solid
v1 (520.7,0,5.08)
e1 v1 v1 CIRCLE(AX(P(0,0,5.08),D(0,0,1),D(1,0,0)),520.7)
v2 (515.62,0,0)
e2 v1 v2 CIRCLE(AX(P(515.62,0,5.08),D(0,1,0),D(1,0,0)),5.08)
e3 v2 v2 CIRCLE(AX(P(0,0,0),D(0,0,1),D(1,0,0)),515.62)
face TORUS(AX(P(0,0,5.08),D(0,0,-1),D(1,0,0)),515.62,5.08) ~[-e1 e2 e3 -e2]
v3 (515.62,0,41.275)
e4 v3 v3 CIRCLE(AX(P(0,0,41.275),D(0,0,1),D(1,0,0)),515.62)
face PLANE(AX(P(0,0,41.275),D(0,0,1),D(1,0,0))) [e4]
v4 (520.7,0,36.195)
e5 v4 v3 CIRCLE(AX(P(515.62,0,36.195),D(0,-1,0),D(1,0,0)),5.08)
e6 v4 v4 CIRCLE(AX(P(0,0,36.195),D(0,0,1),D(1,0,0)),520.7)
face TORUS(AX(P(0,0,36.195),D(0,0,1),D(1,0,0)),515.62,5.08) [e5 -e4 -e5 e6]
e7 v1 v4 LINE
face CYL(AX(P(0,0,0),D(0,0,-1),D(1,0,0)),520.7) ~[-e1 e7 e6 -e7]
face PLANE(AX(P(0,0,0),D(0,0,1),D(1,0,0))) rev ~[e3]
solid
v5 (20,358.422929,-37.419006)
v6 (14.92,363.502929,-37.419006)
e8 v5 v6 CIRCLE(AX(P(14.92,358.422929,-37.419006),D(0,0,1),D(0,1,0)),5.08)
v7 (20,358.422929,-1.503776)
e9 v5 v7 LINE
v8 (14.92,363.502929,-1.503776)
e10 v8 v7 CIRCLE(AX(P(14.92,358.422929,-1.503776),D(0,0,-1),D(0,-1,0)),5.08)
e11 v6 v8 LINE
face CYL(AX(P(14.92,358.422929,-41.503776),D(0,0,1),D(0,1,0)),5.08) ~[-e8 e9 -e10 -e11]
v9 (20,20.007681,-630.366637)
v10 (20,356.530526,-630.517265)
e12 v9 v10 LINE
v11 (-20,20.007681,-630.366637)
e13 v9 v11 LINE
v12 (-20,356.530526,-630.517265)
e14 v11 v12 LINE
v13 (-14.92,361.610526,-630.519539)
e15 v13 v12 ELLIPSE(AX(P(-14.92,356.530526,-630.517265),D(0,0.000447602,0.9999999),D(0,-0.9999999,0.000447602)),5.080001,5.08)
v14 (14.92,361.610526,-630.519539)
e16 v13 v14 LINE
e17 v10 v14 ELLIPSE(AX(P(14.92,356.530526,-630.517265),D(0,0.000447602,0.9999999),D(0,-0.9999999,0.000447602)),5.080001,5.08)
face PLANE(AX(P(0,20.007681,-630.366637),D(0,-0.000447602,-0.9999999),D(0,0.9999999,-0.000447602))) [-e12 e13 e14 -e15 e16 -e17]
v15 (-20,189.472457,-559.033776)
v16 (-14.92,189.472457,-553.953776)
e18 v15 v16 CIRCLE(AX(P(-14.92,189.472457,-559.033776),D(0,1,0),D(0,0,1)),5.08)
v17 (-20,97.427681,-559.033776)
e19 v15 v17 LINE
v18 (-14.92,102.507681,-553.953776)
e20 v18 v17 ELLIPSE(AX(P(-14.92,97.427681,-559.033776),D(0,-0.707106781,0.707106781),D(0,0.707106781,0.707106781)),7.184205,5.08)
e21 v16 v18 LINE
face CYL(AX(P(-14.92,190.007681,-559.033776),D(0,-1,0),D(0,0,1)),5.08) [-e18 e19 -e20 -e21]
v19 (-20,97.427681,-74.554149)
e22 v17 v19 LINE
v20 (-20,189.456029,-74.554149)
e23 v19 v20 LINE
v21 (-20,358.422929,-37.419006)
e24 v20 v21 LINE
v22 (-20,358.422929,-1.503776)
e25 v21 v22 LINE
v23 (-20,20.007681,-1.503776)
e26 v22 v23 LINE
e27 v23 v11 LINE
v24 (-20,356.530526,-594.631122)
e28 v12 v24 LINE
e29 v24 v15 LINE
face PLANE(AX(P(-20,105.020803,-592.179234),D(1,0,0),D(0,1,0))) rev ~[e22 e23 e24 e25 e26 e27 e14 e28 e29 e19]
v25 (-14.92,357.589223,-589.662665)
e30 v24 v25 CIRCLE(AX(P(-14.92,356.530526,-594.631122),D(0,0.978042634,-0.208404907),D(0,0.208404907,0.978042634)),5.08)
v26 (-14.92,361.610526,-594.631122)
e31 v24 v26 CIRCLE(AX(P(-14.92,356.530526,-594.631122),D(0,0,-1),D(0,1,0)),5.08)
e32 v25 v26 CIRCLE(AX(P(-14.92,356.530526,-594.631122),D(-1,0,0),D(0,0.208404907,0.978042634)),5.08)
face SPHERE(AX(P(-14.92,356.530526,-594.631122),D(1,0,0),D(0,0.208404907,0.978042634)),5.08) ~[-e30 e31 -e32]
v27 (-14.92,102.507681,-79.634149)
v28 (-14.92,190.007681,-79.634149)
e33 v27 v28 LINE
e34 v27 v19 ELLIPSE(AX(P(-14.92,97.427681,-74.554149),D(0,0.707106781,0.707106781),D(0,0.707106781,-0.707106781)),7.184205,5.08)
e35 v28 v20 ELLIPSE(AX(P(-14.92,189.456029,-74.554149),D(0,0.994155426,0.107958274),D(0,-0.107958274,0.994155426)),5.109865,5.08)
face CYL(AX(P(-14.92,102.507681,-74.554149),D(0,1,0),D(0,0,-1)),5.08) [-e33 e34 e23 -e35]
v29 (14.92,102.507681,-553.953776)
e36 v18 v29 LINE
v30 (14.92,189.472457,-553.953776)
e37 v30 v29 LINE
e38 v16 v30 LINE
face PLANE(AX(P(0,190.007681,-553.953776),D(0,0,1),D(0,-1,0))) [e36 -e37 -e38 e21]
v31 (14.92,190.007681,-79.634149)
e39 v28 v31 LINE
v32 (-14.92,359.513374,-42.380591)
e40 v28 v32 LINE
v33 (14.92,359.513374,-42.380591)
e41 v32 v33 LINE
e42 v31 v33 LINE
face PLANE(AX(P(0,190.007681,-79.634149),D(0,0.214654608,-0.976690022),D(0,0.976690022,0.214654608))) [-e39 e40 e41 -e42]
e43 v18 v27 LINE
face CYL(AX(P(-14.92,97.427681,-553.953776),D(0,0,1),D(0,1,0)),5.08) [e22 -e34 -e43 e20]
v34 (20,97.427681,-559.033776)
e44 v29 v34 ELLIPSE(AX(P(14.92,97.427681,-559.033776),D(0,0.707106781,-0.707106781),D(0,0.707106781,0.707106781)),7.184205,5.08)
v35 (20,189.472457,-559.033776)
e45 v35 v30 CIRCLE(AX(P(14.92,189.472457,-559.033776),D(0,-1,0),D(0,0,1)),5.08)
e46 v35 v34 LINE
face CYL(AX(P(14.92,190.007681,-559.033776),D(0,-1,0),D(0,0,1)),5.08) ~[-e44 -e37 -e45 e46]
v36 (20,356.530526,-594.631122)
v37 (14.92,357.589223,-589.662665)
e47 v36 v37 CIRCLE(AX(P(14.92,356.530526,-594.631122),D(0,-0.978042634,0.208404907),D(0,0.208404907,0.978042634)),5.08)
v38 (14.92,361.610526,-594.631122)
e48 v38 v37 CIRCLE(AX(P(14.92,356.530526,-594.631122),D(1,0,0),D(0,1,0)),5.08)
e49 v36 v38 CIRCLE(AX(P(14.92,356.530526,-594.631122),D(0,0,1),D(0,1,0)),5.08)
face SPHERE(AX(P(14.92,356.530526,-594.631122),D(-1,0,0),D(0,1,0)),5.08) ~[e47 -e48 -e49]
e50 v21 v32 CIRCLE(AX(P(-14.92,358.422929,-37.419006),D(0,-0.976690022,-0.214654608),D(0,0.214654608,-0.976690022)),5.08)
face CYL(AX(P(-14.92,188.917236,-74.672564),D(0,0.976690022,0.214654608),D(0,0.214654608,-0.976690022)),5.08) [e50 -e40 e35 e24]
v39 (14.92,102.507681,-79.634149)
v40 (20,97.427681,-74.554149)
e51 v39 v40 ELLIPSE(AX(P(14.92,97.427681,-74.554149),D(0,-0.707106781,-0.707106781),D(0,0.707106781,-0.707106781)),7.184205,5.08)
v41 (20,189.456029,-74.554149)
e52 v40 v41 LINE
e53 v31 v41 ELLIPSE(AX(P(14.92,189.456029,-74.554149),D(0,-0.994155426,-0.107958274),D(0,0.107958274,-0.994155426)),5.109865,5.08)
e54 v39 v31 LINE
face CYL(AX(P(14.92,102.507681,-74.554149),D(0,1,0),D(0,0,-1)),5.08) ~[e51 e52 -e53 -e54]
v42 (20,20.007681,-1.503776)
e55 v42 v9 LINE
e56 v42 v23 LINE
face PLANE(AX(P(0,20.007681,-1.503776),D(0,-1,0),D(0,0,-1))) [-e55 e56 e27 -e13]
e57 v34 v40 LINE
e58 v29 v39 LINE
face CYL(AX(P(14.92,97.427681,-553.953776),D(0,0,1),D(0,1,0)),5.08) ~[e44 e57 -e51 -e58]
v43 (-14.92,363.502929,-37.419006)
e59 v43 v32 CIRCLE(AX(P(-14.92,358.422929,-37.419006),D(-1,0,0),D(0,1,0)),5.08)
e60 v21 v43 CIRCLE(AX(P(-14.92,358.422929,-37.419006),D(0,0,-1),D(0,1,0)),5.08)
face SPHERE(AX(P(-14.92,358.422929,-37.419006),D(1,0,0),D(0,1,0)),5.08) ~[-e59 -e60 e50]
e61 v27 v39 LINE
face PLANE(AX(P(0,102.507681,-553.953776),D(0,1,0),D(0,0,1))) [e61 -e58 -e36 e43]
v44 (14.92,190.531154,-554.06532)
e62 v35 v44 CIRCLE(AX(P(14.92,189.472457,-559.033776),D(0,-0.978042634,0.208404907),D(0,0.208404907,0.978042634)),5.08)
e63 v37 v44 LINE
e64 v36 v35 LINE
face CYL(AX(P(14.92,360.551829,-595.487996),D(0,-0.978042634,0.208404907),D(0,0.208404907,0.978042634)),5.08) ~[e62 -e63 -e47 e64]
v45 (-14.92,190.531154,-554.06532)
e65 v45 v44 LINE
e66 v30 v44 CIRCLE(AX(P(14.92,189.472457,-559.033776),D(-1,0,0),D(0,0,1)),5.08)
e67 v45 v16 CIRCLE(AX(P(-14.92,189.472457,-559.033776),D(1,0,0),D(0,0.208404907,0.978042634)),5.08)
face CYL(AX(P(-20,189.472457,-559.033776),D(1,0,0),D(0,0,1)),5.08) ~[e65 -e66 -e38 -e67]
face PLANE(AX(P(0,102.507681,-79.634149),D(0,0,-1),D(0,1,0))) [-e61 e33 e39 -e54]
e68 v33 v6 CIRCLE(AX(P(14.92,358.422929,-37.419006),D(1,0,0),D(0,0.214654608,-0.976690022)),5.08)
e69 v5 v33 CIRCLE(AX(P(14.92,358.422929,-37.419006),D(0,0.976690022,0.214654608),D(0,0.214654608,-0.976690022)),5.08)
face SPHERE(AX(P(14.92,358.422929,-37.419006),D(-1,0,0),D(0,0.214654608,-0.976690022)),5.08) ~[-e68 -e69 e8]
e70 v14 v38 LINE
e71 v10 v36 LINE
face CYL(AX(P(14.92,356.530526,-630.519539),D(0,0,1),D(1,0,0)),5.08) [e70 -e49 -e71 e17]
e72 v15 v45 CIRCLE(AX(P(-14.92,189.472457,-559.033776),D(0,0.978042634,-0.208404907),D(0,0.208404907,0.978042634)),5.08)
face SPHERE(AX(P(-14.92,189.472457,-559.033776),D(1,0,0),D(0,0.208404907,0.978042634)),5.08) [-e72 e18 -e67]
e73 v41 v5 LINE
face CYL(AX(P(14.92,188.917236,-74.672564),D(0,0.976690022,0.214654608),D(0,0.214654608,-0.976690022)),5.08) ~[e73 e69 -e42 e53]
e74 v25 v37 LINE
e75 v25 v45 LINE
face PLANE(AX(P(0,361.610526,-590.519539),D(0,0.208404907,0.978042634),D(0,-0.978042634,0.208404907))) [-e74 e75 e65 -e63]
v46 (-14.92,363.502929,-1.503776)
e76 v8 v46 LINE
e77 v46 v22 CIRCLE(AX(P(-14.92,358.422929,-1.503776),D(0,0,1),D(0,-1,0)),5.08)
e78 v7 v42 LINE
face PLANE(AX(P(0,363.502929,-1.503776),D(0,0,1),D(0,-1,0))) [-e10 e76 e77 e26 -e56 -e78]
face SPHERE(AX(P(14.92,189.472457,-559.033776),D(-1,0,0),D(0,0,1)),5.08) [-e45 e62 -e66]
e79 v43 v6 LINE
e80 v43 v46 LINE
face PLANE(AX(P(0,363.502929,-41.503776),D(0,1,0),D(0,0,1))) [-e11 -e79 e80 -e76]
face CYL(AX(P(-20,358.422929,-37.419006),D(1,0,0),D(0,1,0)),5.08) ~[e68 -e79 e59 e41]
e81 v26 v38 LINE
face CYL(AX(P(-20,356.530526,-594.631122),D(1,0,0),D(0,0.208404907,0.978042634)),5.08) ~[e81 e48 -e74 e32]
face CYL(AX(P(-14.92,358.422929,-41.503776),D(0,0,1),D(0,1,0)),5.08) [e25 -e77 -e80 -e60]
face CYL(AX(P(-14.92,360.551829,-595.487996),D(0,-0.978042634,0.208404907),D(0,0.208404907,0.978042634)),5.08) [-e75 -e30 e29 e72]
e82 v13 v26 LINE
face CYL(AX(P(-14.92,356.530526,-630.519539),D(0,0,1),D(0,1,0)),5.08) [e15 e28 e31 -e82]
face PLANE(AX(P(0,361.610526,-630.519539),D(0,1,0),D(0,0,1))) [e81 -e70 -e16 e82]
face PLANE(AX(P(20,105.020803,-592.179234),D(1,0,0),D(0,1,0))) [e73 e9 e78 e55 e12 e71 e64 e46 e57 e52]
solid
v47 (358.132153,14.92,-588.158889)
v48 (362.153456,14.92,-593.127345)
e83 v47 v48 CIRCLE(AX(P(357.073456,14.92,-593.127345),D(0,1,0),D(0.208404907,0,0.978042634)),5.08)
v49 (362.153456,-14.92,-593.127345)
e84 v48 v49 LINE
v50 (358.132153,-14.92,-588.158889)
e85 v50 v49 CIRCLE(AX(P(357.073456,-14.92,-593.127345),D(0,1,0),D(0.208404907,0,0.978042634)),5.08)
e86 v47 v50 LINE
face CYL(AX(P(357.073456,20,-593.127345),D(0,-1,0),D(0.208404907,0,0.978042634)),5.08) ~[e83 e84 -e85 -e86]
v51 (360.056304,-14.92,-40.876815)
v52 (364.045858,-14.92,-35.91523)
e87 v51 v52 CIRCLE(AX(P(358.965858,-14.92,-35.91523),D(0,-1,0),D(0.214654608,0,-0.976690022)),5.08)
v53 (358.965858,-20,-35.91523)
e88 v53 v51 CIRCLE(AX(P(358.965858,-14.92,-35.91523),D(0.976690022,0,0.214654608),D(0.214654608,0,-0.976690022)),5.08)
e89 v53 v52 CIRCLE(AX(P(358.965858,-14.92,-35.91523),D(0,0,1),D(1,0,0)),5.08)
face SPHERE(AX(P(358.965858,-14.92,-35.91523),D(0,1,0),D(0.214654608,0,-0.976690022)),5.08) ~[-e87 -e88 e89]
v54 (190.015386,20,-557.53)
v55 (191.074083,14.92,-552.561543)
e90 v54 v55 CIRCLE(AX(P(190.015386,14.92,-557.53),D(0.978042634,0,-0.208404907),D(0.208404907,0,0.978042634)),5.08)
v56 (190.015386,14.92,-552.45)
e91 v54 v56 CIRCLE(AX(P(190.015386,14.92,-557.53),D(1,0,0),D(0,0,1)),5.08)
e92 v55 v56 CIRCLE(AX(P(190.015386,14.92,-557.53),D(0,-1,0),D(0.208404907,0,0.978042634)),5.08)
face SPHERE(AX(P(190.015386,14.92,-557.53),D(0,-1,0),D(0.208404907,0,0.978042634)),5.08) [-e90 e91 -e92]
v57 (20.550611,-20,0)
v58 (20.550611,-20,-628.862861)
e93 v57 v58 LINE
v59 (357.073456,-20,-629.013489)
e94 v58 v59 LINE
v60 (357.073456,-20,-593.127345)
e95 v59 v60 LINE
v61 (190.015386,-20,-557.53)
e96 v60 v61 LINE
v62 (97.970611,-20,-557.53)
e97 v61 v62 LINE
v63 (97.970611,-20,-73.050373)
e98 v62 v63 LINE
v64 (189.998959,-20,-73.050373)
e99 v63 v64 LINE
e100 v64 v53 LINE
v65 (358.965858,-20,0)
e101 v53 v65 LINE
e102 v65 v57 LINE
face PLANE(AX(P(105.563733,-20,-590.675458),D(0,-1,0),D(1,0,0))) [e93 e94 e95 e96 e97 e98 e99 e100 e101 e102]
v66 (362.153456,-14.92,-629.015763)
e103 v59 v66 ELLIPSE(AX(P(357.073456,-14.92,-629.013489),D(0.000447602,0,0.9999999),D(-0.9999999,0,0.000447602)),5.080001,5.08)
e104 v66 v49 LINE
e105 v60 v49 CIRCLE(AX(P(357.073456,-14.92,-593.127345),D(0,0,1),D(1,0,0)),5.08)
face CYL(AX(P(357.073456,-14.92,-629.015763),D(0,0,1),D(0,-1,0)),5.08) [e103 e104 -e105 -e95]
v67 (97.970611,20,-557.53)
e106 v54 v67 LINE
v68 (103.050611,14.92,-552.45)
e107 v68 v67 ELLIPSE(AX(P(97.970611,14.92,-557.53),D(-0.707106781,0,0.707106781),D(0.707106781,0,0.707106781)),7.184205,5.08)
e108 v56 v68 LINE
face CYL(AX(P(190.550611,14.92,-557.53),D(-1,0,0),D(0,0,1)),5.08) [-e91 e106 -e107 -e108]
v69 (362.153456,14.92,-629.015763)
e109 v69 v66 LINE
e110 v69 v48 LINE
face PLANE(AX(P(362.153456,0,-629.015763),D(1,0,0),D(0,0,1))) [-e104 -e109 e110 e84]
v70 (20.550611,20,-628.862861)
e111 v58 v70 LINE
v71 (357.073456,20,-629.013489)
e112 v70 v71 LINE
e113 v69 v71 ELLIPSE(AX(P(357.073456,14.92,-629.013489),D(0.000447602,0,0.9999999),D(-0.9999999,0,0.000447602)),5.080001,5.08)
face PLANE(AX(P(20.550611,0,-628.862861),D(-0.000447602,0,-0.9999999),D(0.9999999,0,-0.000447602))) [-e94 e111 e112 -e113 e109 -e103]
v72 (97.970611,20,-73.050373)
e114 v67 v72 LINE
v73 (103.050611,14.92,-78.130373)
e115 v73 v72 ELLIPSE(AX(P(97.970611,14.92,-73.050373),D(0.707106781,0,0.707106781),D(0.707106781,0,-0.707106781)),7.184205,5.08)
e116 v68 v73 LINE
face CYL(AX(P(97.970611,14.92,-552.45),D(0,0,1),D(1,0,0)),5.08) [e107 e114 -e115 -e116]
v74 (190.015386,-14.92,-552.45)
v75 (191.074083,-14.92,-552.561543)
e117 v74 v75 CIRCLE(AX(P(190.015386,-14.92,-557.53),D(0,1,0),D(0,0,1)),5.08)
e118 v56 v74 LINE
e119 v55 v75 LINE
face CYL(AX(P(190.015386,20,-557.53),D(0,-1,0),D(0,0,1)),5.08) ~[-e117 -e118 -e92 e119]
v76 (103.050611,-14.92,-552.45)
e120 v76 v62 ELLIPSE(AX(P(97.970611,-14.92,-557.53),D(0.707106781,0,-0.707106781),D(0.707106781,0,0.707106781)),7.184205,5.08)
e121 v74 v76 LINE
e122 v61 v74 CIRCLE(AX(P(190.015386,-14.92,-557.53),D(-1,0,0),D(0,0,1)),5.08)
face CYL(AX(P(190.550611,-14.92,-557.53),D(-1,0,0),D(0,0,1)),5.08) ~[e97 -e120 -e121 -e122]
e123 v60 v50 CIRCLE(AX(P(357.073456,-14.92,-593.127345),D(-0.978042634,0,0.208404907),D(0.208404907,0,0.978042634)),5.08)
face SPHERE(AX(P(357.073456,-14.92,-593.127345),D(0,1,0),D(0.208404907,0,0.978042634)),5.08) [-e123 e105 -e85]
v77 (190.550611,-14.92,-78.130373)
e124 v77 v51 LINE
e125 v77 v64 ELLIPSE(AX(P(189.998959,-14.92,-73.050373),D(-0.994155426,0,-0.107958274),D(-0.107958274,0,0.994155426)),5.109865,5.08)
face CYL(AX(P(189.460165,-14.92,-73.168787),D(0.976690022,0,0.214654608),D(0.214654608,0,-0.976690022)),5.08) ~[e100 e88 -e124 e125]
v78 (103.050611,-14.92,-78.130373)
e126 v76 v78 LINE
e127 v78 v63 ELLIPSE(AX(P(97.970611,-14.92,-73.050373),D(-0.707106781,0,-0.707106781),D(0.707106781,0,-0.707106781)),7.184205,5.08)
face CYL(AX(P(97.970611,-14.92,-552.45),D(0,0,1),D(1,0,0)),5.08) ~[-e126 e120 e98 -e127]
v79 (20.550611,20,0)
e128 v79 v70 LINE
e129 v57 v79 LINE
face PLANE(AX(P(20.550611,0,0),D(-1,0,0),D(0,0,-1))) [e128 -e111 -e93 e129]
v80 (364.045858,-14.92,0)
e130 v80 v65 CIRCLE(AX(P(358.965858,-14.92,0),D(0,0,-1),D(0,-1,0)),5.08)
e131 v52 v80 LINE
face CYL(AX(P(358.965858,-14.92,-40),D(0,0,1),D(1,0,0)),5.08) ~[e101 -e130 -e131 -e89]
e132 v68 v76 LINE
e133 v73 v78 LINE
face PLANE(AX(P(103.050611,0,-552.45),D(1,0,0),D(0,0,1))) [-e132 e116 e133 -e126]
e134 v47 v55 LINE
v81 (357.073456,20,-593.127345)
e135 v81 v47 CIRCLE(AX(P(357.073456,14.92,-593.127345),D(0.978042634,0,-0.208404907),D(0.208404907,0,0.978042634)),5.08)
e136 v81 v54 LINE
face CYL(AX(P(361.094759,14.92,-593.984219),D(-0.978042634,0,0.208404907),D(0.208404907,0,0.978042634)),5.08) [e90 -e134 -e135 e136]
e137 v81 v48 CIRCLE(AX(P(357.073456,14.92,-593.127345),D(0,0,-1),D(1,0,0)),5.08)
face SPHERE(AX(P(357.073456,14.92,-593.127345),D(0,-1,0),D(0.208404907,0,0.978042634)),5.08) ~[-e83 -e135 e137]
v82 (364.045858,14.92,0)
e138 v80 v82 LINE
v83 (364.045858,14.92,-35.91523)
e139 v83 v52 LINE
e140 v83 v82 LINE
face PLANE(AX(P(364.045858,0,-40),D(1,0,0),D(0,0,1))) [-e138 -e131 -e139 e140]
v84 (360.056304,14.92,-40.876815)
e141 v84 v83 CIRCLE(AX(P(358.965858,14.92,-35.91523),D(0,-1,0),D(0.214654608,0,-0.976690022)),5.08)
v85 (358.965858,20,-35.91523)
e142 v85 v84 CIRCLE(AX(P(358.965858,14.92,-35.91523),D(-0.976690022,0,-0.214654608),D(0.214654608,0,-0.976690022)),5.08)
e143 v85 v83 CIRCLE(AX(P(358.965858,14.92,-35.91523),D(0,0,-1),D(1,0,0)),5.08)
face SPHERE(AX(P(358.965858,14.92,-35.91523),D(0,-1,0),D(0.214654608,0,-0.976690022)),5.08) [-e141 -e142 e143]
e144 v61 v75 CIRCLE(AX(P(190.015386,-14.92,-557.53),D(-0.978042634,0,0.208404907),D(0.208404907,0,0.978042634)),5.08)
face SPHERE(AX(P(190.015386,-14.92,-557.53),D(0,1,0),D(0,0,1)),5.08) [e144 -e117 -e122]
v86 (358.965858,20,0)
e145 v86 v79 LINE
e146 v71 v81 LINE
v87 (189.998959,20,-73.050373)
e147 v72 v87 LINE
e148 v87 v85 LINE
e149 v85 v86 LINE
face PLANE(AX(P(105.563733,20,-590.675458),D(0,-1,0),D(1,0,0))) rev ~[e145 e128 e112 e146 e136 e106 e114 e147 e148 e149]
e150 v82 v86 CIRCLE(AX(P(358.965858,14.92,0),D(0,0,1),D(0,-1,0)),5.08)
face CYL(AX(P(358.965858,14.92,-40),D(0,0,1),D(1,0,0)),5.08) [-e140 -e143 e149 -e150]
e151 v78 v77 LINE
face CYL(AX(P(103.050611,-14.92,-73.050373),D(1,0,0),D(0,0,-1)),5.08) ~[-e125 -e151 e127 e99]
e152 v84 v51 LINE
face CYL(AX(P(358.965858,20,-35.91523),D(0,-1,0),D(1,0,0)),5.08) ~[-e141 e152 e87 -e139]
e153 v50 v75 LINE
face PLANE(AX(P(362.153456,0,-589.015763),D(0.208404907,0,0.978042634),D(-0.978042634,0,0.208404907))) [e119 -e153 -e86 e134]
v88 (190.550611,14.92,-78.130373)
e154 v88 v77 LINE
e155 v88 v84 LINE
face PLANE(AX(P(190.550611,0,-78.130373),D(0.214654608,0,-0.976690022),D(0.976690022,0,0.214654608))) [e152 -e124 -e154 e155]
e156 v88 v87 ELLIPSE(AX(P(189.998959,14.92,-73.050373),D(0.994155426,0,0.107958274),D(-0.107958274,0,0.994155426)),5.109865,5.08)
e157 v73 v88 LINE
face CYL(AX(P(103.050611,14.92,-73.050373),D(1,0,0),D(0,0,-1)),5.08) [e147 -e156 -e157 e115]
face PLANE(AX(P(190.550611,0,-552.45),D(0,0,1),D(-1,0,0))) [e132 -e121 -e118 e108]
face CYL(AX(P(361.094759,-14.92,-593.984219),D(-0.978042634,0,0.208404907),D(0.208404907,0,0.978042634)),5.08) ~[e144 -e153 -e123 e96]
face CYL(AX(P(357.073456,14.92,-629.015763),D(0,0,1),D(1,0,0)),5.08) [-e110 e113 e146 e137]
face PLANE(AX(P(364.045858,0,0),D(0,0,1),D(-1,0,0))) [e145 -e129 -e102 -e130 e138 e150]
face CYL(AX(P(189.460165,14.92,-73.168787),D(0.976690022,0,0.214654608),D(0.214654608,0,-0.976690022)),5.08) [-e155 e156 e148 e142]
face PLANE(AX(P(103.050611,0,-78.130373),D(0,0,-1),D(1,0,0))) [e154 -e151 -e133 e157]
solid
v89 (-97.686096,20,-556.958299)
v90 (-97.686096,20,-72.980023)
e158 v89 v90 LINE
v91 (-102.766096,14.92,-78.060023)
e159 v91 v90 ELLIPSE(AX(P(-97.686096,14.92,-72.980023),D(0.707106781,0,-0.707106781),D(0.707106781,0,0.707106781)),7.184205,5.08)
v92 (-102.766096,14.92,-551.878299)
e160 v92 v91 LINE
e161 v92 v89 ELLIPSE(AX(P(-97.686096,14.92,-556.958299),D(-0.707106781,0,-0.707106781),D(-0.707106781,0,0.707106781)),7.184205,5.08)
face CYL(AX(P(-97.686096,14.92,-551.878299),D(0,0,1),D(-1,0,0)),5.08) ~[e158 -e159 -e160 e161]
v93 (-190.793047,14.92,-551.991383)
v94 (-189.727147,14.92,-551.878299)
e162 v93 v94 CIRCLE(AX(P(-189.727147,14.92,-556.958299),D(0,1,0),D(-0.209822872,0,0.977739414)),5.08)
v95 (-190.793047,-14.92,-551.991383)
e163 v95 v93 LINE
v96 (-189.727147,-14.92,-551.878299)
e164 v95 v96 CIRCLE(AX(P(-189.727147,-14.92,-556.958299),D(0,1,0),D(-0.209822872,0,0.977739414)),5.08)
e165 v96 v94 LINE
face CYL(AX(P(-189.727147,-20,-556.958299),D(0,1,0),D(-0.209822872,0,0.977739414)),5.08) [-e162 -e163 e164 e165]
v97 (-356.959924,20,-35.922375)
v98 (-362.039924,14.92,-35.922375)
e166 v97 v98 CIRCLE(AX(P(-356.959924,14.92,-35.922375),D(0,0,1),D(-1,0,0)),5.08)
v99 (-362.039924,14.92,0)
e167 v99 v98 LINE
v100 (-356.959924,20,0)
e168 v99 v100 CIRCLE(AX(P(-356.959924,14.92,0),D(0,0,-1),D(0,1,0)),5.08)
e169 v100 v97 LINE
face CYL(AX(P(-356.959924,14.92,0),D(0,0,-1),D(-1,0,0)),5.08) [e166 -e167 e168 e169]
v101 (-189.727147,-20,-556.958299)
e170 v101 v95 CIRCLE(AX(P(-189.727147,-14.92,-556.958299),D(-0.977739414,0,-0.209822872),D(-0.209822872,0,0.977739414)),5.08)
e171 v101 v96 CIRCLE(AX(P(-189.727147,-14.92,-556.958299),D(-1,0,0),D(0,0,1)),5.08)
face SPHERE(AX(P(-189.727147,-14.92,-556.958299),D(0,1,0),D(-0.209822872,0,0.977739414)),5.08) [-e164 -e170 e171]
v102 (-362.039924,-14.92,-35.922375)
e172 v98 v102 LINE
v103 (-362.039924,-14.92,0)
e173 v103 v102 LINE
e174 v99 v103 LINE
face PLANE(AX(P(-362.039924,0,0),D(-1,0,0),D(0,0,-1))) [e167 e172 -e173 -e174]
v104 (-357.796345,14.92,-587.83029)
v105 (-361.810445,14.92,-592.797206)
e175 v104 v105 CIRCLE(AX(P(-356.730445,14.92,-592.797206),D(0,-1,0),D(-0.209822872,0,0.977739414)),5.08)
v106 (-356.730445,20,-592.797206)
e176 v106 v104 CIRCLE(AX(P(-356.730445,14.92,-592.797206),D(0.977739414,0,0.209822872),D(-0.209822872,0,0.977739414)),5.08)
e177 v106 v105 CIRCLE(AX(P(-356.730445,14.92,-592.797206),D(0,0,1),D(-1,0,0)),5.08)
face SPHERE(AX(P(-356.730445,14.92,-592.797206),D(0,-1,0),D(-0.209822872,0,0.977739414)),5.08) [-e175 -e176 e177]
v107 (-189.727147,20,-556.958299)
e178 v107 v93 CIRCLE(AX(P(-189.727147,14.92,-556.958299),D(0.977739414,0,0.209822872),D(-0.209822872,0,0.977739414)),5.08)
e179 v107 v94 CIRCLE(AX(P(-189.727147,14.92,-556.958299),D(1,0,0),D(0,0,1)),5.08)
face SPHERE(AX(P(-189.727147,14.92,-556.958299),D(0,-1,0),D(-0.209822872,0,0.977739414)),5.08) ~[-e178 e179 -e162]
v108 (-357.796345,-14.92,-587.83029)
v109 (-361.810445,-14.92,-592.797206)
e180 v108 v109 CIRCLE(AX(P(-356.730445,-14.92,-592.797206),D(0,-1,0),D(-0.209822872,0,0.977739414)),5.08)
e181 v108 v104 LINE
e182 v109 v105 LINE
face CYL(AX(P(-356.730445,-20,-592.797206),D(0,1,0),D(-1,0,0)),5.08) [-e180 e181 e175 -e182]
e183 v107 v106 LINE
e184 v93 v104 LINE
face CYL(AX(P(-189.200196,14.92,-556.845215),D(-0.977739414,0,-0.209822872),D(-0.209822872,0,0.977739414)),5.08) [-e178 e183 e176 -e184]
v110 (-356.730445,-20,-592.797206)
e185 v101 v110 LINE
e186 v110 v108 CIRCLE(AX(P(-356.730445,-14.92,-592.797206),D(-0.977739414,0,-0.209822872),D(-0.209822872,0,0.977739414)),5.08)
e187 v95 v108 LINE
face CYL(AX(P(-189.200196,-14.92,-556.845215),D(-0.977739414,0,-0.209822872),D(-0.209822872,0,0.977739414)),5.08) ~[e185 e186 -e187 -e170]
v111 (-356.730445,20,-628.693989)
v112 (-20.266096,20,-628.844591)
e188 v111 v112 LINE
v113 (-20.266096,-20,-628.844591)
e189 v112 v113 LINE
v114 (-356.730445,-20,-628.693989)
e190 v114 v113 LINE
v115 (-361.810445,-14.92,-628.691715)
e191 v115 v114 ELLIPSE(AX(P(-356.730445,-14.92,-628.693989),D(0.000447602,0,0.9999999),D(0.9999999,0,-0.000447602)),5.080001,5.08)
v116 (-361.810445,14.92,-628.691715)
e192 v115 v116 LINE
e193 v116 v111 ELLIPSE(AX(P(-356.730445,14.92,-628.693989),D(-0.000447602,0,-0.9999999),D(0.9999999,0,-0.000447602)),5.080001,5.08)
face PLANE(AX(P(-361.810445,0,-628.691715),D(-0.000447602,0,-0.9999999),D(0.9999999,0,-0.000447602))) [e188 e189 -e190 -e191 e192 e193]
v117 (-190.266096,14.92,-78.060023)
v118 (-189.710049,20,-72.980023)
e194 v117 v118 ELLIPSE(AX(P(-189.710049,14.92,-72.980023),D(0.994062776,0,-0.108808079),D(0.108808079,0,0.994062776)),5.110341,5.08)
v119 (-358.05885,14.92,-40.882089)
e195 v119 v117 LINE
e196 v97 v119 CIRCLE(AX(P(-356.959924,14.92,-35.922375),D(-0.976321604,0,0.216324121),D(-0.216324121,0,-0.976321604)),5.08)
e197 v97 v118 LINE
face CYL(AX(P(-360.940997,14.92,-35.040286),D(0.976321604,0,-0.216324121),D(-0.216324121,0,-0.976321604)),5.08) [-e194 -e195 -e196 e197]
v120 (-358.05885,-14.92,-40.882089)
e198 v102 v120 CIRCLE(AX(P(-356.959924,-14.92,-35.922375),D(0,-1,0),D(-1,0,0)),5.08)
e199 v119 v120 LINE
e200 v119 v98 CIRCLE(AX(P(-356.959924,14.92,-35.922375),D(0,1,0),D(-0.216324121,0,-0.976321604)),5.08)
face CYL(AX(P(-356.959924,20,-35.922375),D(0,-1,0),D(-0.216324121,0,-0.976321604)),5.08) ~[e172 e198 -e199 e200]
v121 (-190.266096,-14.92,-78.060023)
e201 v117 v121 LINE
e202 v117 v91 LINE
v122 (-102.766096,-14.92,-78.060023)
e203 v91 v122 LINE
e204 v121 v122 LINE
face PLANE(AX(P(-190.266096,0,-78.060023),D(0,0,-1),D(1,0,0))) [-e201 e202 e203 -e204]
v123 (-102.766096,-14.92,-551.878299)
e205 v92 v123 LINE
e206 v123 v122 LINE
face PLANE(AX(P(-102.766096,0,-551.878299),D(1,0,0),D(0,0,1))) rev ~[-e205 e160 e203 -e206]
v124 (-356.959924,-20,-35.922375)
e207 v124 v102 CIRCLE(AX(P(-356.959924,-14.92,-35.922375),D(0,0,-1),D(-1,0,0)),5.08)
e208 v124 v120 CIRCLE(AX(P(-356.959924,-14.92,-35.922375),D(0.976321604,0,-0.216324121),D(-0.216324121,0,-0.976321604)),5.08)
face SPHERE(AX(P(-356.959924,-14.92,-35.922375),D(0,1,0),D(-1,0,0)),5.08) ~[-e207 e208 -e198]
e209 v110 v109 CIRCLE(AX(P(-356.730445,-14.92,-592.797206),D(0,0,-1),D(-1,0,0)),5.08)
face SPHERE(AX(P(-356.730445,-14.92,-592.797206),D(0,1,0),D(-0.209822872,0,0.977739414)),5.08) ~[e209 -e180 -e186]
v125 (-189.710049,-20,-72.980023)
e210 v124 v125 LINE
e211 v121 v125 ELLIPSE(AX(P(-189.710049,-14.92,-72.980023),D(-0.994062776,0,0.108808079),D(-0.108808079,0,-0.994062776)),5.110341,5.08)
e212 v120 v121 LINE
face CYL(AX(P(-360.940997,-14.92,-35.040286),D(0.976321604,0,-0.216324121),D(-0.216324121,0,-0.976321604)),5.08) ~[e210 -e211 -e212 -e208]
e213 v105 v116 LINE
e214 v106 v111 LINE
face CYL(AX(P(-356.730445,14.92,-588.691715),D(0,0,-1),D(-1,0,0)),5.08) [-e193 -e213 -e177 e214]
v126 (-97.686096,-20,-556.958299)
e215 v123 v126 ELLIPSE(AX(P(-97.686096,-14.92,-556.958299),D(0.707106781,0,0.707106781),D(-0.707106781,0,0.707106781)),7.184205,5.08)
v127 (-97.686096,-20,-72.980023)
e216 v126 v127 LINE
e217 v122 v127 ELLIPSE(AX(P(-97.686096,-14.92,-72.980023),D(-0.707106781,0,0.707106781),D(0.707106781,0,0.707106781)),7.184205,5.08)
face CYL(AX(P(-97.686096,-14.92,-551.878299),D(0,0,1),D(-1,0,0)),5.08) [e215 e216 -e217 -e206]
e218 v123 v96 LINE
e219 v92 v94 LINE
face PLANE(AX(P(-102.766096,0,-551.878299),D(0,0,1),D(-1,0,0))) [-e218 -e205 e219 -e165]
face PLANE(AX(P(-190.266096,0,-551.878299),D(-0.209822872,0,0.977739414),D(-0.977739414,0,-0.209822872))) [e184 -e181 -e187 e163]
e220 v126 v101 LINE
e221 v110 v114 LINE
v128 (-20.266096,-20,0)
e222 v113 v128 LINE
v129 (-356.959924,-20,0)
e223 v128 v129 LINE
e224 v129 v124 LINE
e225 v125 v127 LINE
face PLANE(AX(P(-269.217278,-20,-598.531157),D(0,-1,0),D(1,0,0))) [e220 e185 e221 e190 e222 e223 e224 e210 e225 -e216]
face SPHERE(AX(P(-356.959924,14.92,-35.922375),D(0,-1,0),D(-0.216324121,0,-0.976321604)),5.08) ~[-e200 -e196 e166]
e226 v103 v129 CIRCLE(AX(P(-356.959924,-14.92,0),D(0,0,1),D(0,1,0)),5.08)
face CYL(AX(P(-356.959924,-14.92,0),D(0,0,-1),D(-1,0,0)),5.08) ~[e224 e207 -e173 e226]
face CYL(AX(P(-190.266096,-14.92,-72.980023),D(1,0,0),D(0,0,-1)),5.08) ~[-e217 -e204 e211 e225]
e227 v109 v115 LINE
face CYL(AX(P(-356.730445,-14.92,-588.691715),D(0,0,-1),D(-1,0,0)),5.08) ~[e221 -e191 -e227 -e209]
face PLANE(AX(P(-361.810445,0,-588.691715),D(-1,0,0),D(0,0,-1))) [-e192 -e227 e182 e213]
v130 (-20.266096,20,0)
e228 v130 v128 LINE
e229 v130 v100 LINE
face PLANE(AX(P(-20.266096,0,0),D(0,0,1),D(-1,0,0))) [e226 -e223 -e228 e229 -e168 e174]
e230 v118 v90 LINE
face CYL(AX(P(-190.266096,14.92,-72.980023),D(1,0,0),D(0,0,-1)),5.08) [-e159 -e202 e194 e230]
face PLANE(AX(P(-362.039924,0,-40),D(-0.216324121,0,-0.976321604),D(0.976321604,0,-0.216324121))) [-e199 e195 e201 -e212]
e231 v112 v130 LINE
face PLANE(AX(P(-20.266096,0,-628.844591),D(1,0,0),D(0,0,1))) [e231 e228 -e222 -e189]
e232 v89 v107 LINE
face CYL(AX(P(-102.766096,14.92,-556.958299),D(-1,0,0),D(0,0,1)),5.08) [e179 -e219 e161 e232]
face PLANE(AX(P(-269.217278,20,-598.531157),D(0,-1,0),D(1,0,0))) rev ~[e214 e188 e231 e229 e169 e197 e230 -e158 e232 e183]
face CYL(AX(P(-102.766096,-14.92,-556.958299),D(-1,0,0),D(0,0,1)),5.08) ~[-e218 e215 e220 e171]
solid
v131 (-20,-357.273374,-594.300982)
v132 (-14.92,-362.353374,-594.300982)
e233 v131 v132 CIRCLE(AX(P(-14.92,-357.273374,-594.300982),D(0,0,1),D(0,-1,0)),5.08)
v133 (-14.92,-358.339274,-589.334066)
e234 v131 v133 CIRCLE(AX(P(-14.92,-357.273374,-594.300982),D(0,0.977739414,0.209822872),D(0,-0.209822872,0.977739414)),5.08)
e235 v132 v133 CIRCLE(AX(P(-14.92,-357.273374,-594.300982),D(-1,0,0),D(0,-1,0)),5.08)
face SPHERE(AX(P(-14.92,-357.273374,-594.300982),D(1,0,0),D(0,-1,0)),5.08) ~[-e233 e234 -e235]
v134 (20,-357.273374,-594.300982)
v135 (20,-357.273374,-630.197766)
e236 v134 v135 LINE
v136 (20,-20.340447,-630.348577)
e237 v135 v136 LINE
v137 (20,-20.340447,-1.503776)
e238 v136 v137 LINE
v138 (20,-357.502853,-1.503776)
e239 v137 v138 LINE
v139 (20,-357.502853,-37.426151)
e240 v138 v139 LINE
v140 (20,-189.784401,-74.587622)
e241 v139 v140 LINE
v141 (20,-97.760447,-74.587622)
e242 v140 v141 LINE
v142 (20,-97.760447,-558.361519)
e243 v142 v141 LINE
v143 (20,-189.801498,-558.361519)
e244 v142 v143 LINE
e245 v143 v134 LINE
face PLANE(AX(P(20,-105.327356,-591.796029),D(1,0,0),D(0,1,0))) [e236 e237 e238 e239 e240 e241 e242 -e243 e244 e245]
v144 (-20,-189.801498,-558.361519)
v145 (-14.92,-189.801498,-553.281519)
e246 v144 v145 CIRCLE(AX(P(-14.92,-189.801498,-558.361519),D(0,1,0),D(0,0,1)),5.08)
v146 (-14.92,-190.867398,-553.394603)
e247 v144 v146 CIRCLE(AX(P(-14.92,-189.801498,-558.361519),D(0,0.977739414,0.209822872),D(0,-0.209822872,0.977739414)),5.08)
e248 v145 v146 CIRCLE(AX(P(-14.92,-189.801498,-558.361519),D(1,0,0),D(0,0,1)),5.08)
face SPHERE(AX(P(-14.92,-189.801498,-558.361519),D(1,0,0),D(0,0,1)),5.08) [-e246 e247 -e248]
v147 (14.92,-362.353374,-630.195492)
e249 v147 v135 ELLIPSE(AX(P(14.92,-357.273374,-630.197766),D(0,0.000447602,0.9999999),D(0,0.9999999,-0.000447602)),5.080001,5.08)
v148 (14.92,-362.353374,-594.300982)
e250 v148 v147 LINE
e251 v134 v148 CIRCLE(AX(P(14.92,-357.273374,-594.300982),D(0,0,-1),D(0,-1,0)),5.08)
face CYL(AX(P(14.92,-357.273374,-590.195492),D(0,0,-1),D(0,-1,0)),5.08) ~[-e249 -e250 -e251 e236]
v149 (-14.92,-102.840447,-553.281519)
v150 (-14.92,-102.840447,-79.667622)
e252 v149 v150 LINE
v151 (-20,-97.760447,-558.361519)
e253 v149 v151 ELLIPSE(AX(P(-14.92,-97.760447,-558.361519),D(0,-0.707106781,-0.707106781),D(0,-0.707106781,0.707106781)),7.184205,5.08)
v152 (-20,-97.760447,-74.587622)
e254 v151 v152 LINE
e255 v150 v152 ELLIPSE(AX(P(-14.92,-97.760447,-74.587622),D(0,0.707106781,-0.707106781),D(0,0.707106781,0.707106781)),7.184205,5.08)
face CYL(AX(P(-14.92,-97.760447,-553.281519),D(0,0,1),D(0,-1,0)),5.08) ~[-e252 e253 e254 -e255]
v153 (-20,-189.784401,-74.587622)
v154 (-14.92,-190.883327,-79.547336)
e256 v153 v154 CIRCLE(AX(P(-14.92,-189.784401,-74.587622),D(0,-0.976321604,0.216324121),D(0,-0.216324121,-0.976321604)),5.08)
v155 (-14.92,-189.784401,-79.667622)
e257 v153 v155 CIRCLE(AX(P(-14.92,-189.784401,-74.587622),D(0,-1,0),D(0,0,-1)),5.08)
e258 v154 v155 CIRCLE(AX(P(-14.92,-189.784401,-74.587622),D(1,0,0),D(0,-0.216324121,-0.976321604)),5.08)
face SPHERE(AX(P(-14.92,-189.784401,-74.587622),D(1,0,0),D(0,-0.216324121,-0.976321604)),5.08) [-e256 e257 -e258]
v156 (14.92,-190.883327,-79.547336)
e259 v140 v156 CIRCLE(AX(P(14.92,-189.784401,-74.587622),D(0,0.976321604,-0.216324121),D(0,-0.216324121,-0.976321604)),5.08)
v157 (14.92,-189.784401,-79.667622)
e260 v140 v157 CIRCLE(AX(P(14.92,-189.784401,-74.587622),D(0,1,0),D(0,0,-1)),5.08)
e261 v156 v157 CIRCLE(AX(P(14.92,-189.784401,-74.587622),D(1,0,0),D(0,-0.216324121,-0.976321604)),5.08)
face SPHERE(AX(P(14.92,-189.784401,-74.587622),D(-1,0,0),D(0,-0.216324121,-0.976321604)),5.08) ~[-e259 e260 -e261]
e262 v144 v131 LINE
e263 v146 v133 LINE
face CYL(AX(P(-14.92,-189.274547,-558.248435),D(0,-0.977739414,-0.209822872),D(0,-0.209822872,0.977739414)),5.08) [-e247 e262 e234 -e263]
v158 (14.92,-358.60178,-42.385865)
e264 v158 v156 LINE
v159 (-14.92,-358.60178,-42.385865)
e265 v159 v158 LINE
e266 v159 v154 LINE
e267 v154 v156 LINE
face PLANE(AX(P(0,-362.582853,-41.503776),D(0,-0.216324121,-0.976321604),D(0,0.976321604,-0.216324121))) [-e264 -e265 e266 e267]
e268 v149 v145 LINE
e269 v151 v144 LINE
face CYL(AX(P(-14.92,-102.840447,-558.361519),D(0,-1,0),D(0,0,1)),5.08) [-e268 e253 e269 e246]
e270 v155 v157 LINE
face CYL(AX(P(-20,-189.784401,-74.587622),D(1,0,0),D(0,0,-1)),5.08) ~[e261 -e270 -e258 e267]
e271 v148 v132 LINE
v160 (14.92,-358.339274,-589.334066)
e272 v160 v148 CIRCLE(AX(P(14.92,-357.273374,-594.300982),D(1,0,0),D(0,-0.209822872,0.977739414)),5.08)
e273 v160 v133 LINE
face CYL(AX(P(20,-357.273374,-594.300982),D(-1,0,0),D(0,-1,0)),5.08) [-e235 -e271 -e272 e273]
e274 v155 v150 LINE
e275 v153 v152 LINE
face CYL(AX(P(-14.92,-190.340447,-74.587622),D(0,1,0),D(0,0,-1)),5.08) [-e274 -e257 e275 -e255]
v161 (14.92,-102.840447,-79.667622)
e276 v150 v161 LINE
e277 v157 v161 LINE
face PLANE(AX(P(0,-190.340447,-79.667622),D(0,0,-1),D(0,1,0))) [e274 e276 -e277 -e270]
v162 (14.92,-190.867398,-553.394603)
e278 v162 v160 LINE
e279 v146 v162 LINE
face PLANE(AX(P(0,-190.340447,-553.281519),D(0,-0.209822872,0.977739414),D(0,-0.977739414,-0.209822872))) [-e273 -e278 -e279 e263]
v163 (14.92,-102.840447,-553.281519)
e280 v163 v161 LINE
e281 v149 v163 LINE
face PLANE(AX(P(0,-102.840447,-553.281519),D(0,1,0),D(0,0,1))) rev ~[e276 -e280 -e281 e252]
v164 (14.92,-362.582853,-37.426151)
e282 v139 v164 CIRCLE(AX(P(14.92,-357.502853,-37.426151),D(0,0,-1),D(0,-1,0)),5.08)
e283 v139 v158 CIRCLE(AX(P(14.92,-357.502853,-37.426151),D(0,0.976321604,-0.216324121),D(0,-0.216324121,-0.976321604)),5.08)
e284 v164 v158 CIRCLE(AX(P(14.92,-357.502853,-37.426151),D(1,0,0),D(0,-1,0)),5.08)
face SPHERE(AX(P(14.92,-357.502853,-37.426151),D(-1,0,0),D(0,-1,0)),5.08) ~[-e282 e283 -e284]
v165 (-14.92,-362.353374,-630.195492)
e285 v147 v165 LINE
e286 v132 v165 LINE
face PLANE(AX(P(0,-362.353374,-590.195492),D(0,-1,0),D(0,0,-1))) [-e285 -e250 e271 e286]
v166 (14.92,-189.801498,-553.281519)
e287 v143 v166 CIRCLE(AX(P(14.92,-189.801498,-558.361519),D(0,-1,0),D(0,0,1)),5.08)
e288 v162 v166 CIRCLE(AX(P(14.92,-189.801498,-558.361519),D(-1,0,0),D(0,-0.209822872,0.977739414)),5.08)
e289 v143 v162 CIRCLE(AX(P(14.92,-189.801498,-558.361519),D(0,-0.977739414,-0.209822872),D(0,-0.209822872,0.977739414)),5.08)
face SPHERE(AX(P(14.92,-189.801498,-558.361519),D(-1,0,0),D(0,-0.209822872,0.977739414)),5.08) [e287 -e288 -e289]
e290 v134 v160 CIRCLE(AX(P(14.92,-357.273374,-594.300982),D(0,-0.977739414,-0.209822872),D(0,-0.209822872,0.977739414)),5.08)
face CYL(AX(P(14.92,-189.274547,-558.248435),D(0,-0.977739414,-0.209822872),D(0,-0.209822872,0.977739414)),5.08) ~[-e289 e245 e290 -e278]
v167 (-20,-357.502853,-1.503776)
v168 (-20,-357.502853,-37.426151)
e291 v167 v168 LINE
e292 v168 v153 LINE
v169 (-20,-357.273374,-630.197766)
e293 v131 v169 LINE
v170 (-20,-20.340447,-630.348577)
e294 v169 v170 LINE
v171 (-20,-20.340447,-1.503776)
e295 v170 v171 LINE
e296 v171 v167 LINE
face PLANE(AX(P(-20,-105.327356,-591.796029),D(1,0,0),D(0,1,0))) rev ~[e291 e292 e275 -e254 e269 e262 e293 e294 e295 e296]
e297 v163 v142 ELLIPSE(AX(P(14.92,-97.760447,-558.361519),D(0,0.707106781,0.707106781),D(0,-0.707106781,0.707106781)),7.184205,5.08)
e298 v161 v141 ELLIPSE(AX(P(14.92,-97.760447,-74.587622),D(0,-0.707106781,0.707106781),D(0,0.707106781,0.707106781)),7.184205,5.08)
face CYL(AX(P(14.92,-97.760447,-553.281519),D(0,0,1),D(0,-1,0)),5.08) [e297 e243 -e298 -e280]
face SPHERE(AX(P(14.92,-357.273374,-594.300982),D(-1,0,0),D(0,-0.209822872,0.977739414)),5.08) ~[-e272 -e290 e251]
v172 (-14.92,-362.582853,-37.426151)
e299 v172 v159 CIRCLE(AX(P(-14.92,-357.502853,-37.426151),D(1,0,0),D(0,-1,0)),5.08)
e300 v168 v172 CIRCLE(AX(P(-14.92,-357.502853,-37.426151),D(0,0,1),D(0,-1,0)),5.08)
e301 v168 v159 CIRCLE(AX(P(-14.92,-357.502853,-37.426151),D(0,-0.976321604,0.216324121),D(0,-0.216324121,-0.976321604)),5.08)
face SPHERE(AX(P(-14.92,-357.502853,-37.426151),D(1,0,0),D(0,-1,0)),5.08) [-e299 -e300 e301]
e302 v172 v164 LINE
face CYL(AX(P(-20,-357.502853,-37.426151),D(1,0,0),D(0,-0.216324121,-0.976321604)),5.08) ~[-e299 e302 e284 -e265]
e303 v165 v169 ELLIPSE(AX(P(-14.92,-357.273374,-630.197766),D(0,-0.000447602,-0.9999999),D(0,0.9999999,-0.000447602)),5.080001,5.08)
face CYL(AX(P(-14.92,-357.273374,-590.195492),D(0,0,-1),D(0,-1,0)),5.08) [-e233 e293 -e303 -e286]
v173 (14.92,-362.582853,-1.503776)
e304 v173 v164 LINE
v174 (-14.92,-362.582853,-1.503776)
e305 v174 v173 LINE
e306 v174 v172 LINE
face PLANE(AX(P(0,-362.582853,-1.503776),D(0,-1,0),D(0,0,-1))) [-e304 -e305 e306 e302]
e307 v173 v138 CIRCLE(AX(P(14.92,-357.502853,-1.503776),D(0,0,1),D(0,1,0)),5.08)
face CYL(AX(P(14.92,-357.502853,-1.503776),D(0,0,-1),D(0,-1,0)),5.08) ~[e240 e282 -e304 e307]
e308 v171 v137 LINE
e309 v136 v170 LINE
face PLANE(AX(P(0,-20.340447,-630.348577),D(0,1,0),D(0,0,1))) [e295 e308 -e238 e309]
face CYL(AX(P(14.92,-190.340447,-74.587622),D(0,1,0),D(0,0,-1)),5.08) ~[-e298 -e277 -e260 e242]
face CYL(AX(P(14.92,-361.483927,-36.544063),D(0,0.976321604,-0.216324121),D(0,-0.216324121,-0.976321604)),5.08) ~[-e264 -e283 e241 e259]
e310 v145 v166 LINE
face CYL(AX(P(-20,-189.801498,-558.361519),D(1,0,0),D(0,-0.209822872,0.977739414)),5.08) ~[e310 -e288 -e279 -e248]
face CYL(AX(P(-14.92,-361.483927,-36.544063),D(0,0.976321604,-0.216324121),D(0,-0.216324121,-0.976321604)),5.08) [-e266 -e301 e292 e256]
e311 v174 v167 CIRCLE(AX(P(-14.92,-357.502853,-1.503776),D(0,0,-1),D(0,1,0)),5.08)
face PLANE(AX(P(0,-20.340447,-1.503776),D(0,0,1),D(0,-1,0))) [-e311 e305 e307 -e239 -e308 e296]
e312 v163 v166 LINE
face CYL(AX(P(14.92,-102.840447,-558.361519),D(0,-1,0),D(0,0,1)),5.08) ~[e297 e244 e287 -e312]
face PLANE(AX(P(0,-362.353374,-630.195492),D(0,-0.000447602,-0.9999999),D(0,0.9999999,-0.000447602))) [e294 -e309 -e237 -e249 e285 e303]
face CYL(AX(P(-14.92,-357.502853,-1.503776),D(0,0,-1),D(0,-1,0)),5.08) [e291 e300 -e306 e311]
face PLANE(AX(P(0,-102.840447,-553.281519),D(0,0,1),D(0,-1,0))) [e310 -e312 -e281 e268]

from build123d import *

# Parameters (mm, degrees)
F0_R     = 520.7
F0_W     = 41.275
F0_H     = 256.3125
F0_W_2   = 256.3125
F0_H_2   = 41.275
F0_H_3   = 85
F0_W_3   = 85
F1_DEPTH = 41.275
F2_W     = 82.5
F2_H     = 473.8182766121
F3_DEPTH = 20
F2_H_2   = 474.3196274297
F4_W     = 82.5
F4_H     = 474.3196274297
F5_DEPTH = 20
F4_H_2   = 473.6138966055
F6_R     = 5.08
F6_2_R   = 5.08
F6_3_R   = 5.08
F6_4_R   = 5.08
F6_5_R   = 5.08


# Not quite as in the source:
# - a feature names something its author has since deleted; it is built from what else it names


with BuildPart() as f1:
    # F0 (on Top) → F1 (new body)
    with BuildSketch(Plane.XY):
        Circle(F0_R)
        Polygon((-20.6375, 361.95), (20.6375, 361.95), (20.6375, 105.6375), (20.6375, 20.6375), (105.6375, 20.6375), (361.95, 20.6375), (361.95, -20.6375), (105.6375, -20.6375), (20.6375, -20.6375), (20.6375, -105.6375), (20.6375, -361.95), (-20.6375, -361.95), (-20.6375, -105.6375), (-20.6375, -20.6375), (-105.6375, -20.6375), (-361.95, -20.6375), (-361.95, 20.6375), (-105.6375, 20.6375), (-20.6375, 20.6375), (-20.6375, 105.6375), align=None, mode=Mode.SUBTRACT)
        with Locations((0, 233.79375)):
            Rectangle(F0_W, F0_H)
        with Locations((-233.79375, 0)):
            Rectangle(F0_W_2, F0_H_2)
        with Locations((0, -233.79375)):
            Rectangle(F0_W, F0_H)
        with Locations((233.79375, 0)):
            Rectangle(F0_W_2, F0_H_2)
        Rectangle(F0_W, F0_H_2)
        with Locations((0, 63.1375)):
            Rectangle(F0_W, F0_H_3)
        with Locations((63.1375, 0)):
            Rectangle(F0_W_3, F0_H_2)
        with Locations((0, -63.1375)):
            Rectangle(F0_W, F0_H_3)
        with Locations((-63.1375, 0)):
            Rectangle(F0_W_3, F0_H_2)
    extrude(amount=F1_DEPTH)

    # F6
    f6_edges = [f1.edges().sort_by_distance(p)[0] for p in [
        (-520.7, 0, 41.275),
        (-520.7, 0, 0),
    ]]
    fillet(f6_edges, radius=F6_R)


with BuildPart() as f3:
    # F2 (on Front) → F3 (new body, symmetric)
    with BuildSketch(Plane.XZ):
        Polygon((-361.8104448189, -628.6917154359), (-190.2660957707, -628.7684989539), (-190.2660957707, -551.8782992659), (-361.8104448189, -588.6917154359), align=None)
        Polygon((-190.2660957707, -628.7684989539), (-20.2660957707, -628.8445912188), (-20.2660957707, -551.8782992659), (-102.7660957707, -551.8782992659), (-190.2660957707, -551.8782992659), align=None)
        Polygon((-102.7660957707, -78.0600226537), (-20.2660957707, -78.0600226537), (-20.2660957707, 0), (-190.2660957707, 0), (-190.2660957707, -78.0600226537), align=None)
        Polygon((-362.0399236679, -40), (-190.2660957707, -78.0600226537), (-190.2660957707, 0), (-362.0399236679, 0), align=None)
        with Locations((-61.5160957707, -314.9691609598)):
            Rectangle(F2_W, F2_H)
    extrude(amount=F3_DEPTH, both=True)

    # F6#4
    f6_4_edges = [f3.edges().sort_by_distance(p)[0] for p in [
        (-276.03827, 20, -570.285007),
        (-146.516096, 20, -551.878299),
        (-102.766096, 20, -314.969161),
        (-146.516096, 20, -78.060023),
        (-276.15301, 20, -59.030011),
        (-276.15301, -20, -59.030011),
        (-146.516096, -20, -78.060023),
        (-362.039924, 20, -20),
        (-361.810445, 20, -608.691715),
        (-361.810445, -20, -608.691715),
        (-361.810445, 0, -588.691715),
        (-362.039924, 0, -40),
        (-362.039924, -20, -20),
        (-276.03827, -20, -570.285007),
        (-146.516096, -20, -551.878299),
        (-190.266096, 0, -551.878299),
        (-102.766096, -20, -314.969161),
    ]]
    fillet(f6_4_edges, radius=F6_4_R)


with BuildPart() as f3b:
    # F2 (on Front) → F3, piece 2 (new body, symmetric)
    with BuildSketch(Plane.XZ):
        Polygon((103.0506108094, -552.45), (20.5506108094, -552.45), (20.5506108094, -628.8628608403), (190.5506108094, -628.9389531052), (190.5506108094, -552.45), align=None)
        Polygon((362.153455615, -589.0157628059), (190.5506108094, -552.45), (190.5506108094, -628.9389531052), (362.153455615, -629.0157628059), align=None)
        Polygon((364.0458583832, 0), (190.5506108094, 0), (190.5506108094, -78.1303725703), (364.0458583832, -40), align=None)
        Polygon((190.5506108094, 0), (20.5506108094, 0), (20.5506108094, -78.1303725703), (103.0506108094, -78.1303725703), (190.5506108094, -78.1303725703), align=None)
        with Locations((61.8006108094, -315.2901862851)):
            Rectangle(F2_W, F2_H_2)
    extrude(amount=F3_DEPTH, both=True)

    # F6#2
    f6_2_edges = [f3b.edges().sort_by_distance(p)[0] for p in [
        (277.298235, -20, -59.065186),
        (146.800611, -20, -78.130373),
        (364.045858, -20, -20),
        (364.045858, 20, -20),
        (364.045858, 0, -40),
        (277.298235, 20, -59.065186),
        (146.800611, 20, -78.130373),
        (103.050611, 20, -315.290186),
        (103.050611, -20, -315.290186),
        (146.800611, -20, -552.45),
        (276.352033, -20, -570.732881),
        (362.153456, 20, -609.015763),
        (362.153456, -20, -609.015763),
        (362.153456, 0, -589.015763),
        (276.352033, 20, -570.732881),
        (146.800611, 20, -552.45),
        (190.550611, 0, -552.45),
    ]]
    fillet(f6_2_edges, radius=F6_2_R)


with BuildPart() as f5:
    # F4 (on Right) → F5 (new body, symmetric)
    with BuildSketch(Plane.YZ):
        Polygon((102.507681396, -553.9537763821), (20.007681396, -553.9537763821), (20.007681396, -630.3666372223), (190.007681396, -630.4427294873), (190.007681396, -553.9537763821), align=None)
        Polygon((361.6105262016, -590.519539188), (190.007681396, -553.9537763821), (190.007681396, -630.4427294873), (361.6105262016, -630.519539188), align=None)
        Polygon((190.007681396, -1.5037763821), (20.007681396, -1.5037763821), (20.007681396, -79.6341489524), (102.507681396, -79.6341489524), (190.007681396, -79.6341489524), align=None)
        Polygon((363.5029289697, -1.5037763821), (190.007681396, -1.5037763821), (190.007681396, -79.6341489524), (363.5029289697, -41.5037763821), align=None)
        with Locations((61.257681396, -316.7939626672)):
            Rectangle(F4_W, F4_H)
    extrude(amount=F5_DEPTH, both=True)

    # F6#3
    f6_3_edges = [f5.edges().sort_by_distance(p)[0] for p in [
        (20, 146.257681, -79.634149),
        (20, 102.507681, -316.793963),
        (20, 276.755305, -60.568963),
        (20, 363.502929, -21.503776),
        (-20, 363.502929, -21.503776),
        (-20, 276.755305, -60.568963),
        (-20, 146.257681, -79.634149),
        (-20, 102.507681, -316.793963),
        (20, 146.257681, -553.953776),
        (20, 275.809104, -572.236658),
        (-20, 361.610526, -610.519539),
        (0, 361.610526, -590.519539),
        (20, 361.610526, -610.519539),
        (-20, 275.809104, -572.236658),
        (-20, 146.257681, -553.953776),
        (0, 190.007681, -553.953776),
        (0, 363.502929, -41.503776),
    ]]
    fillet(f6_3_edges, radius=F6_3_R)


with BuildPart() as f5b:
    # F4 (on Right) → F5, piece 2 (new body, symmetric)
    with BuildSketch(Plane.YZ):
        Polygon((-190.3404469946, -630.2724850723), (-20.3404469946, -630.3485773372), (-20.3404469946, -553.2815187716), (-102.8404469946, -553.2815187716), (-190.3404469946, -553.2815187716), align=None)
        Polygon((-362.3533742323, -630.195491818), (-190.3404469946, -630.2724850723), (-190.3404469946, -553.2815187716), (-362.3533742323, -590.195491818), align=None)
        Polygon((-102.8404469946, -79.6676221661), (-20.3404469946, -79.6676221661), (-20.3404469946, -1.5037763821), (-190.3404469946, -1.5037763821), (-190.3404469946, -79.6676221661), align=None)
        Polygon((-362.5828530813, -41.5037763821), (-190.3404469946, -79.6676221661), (-190.3404469946, -1.5037763821), (-362.5828530813, -1.5037763821), align=None)
        with Locations((-61.5904469946, -316.4745704688)):
            Rectangle(F4_W, F4_H_2)
    extrude(amount=F5_DEPTH, both=True)

    # F6#5
    f6_5_edges = [f5b.edges().sort_by_distance(p)[0] for p in [
        (20, -102.840447, -316.47457),
        (-20, -102.840447, -316.47457),
        (20, -146.590447, -79.667622),
        (-20, -146.590447, -79.667622),
        (0, -190.340447, -79.667622),
        (20, -276.46165, -60.585699),
        (-20, -276.46165, -60.585699),
        (20, -276.346911, -571.738505),
        (20, -146.590447, -553.281519),
        (20, -362.353374, -610.195492),
        (0, -362.353374, -590.195492),
        (-20, -362.353374, -610.195492),
        (-20, -146.590447, -553.281519),
        (-20, -276.346911, -571.738505),
        (0, -190.340447, -553.281519),
        (0, -362.582853, -41.503776),
        (20, -362.582853, -21.503776),
        (-20, -362.582853, -21.503776),
    ]]
    fillet(f6_5_edges, radius=F6_5_R)


solid = Compound([f1.part, f3.part, f3b.part, f5.part, f5b.part])
